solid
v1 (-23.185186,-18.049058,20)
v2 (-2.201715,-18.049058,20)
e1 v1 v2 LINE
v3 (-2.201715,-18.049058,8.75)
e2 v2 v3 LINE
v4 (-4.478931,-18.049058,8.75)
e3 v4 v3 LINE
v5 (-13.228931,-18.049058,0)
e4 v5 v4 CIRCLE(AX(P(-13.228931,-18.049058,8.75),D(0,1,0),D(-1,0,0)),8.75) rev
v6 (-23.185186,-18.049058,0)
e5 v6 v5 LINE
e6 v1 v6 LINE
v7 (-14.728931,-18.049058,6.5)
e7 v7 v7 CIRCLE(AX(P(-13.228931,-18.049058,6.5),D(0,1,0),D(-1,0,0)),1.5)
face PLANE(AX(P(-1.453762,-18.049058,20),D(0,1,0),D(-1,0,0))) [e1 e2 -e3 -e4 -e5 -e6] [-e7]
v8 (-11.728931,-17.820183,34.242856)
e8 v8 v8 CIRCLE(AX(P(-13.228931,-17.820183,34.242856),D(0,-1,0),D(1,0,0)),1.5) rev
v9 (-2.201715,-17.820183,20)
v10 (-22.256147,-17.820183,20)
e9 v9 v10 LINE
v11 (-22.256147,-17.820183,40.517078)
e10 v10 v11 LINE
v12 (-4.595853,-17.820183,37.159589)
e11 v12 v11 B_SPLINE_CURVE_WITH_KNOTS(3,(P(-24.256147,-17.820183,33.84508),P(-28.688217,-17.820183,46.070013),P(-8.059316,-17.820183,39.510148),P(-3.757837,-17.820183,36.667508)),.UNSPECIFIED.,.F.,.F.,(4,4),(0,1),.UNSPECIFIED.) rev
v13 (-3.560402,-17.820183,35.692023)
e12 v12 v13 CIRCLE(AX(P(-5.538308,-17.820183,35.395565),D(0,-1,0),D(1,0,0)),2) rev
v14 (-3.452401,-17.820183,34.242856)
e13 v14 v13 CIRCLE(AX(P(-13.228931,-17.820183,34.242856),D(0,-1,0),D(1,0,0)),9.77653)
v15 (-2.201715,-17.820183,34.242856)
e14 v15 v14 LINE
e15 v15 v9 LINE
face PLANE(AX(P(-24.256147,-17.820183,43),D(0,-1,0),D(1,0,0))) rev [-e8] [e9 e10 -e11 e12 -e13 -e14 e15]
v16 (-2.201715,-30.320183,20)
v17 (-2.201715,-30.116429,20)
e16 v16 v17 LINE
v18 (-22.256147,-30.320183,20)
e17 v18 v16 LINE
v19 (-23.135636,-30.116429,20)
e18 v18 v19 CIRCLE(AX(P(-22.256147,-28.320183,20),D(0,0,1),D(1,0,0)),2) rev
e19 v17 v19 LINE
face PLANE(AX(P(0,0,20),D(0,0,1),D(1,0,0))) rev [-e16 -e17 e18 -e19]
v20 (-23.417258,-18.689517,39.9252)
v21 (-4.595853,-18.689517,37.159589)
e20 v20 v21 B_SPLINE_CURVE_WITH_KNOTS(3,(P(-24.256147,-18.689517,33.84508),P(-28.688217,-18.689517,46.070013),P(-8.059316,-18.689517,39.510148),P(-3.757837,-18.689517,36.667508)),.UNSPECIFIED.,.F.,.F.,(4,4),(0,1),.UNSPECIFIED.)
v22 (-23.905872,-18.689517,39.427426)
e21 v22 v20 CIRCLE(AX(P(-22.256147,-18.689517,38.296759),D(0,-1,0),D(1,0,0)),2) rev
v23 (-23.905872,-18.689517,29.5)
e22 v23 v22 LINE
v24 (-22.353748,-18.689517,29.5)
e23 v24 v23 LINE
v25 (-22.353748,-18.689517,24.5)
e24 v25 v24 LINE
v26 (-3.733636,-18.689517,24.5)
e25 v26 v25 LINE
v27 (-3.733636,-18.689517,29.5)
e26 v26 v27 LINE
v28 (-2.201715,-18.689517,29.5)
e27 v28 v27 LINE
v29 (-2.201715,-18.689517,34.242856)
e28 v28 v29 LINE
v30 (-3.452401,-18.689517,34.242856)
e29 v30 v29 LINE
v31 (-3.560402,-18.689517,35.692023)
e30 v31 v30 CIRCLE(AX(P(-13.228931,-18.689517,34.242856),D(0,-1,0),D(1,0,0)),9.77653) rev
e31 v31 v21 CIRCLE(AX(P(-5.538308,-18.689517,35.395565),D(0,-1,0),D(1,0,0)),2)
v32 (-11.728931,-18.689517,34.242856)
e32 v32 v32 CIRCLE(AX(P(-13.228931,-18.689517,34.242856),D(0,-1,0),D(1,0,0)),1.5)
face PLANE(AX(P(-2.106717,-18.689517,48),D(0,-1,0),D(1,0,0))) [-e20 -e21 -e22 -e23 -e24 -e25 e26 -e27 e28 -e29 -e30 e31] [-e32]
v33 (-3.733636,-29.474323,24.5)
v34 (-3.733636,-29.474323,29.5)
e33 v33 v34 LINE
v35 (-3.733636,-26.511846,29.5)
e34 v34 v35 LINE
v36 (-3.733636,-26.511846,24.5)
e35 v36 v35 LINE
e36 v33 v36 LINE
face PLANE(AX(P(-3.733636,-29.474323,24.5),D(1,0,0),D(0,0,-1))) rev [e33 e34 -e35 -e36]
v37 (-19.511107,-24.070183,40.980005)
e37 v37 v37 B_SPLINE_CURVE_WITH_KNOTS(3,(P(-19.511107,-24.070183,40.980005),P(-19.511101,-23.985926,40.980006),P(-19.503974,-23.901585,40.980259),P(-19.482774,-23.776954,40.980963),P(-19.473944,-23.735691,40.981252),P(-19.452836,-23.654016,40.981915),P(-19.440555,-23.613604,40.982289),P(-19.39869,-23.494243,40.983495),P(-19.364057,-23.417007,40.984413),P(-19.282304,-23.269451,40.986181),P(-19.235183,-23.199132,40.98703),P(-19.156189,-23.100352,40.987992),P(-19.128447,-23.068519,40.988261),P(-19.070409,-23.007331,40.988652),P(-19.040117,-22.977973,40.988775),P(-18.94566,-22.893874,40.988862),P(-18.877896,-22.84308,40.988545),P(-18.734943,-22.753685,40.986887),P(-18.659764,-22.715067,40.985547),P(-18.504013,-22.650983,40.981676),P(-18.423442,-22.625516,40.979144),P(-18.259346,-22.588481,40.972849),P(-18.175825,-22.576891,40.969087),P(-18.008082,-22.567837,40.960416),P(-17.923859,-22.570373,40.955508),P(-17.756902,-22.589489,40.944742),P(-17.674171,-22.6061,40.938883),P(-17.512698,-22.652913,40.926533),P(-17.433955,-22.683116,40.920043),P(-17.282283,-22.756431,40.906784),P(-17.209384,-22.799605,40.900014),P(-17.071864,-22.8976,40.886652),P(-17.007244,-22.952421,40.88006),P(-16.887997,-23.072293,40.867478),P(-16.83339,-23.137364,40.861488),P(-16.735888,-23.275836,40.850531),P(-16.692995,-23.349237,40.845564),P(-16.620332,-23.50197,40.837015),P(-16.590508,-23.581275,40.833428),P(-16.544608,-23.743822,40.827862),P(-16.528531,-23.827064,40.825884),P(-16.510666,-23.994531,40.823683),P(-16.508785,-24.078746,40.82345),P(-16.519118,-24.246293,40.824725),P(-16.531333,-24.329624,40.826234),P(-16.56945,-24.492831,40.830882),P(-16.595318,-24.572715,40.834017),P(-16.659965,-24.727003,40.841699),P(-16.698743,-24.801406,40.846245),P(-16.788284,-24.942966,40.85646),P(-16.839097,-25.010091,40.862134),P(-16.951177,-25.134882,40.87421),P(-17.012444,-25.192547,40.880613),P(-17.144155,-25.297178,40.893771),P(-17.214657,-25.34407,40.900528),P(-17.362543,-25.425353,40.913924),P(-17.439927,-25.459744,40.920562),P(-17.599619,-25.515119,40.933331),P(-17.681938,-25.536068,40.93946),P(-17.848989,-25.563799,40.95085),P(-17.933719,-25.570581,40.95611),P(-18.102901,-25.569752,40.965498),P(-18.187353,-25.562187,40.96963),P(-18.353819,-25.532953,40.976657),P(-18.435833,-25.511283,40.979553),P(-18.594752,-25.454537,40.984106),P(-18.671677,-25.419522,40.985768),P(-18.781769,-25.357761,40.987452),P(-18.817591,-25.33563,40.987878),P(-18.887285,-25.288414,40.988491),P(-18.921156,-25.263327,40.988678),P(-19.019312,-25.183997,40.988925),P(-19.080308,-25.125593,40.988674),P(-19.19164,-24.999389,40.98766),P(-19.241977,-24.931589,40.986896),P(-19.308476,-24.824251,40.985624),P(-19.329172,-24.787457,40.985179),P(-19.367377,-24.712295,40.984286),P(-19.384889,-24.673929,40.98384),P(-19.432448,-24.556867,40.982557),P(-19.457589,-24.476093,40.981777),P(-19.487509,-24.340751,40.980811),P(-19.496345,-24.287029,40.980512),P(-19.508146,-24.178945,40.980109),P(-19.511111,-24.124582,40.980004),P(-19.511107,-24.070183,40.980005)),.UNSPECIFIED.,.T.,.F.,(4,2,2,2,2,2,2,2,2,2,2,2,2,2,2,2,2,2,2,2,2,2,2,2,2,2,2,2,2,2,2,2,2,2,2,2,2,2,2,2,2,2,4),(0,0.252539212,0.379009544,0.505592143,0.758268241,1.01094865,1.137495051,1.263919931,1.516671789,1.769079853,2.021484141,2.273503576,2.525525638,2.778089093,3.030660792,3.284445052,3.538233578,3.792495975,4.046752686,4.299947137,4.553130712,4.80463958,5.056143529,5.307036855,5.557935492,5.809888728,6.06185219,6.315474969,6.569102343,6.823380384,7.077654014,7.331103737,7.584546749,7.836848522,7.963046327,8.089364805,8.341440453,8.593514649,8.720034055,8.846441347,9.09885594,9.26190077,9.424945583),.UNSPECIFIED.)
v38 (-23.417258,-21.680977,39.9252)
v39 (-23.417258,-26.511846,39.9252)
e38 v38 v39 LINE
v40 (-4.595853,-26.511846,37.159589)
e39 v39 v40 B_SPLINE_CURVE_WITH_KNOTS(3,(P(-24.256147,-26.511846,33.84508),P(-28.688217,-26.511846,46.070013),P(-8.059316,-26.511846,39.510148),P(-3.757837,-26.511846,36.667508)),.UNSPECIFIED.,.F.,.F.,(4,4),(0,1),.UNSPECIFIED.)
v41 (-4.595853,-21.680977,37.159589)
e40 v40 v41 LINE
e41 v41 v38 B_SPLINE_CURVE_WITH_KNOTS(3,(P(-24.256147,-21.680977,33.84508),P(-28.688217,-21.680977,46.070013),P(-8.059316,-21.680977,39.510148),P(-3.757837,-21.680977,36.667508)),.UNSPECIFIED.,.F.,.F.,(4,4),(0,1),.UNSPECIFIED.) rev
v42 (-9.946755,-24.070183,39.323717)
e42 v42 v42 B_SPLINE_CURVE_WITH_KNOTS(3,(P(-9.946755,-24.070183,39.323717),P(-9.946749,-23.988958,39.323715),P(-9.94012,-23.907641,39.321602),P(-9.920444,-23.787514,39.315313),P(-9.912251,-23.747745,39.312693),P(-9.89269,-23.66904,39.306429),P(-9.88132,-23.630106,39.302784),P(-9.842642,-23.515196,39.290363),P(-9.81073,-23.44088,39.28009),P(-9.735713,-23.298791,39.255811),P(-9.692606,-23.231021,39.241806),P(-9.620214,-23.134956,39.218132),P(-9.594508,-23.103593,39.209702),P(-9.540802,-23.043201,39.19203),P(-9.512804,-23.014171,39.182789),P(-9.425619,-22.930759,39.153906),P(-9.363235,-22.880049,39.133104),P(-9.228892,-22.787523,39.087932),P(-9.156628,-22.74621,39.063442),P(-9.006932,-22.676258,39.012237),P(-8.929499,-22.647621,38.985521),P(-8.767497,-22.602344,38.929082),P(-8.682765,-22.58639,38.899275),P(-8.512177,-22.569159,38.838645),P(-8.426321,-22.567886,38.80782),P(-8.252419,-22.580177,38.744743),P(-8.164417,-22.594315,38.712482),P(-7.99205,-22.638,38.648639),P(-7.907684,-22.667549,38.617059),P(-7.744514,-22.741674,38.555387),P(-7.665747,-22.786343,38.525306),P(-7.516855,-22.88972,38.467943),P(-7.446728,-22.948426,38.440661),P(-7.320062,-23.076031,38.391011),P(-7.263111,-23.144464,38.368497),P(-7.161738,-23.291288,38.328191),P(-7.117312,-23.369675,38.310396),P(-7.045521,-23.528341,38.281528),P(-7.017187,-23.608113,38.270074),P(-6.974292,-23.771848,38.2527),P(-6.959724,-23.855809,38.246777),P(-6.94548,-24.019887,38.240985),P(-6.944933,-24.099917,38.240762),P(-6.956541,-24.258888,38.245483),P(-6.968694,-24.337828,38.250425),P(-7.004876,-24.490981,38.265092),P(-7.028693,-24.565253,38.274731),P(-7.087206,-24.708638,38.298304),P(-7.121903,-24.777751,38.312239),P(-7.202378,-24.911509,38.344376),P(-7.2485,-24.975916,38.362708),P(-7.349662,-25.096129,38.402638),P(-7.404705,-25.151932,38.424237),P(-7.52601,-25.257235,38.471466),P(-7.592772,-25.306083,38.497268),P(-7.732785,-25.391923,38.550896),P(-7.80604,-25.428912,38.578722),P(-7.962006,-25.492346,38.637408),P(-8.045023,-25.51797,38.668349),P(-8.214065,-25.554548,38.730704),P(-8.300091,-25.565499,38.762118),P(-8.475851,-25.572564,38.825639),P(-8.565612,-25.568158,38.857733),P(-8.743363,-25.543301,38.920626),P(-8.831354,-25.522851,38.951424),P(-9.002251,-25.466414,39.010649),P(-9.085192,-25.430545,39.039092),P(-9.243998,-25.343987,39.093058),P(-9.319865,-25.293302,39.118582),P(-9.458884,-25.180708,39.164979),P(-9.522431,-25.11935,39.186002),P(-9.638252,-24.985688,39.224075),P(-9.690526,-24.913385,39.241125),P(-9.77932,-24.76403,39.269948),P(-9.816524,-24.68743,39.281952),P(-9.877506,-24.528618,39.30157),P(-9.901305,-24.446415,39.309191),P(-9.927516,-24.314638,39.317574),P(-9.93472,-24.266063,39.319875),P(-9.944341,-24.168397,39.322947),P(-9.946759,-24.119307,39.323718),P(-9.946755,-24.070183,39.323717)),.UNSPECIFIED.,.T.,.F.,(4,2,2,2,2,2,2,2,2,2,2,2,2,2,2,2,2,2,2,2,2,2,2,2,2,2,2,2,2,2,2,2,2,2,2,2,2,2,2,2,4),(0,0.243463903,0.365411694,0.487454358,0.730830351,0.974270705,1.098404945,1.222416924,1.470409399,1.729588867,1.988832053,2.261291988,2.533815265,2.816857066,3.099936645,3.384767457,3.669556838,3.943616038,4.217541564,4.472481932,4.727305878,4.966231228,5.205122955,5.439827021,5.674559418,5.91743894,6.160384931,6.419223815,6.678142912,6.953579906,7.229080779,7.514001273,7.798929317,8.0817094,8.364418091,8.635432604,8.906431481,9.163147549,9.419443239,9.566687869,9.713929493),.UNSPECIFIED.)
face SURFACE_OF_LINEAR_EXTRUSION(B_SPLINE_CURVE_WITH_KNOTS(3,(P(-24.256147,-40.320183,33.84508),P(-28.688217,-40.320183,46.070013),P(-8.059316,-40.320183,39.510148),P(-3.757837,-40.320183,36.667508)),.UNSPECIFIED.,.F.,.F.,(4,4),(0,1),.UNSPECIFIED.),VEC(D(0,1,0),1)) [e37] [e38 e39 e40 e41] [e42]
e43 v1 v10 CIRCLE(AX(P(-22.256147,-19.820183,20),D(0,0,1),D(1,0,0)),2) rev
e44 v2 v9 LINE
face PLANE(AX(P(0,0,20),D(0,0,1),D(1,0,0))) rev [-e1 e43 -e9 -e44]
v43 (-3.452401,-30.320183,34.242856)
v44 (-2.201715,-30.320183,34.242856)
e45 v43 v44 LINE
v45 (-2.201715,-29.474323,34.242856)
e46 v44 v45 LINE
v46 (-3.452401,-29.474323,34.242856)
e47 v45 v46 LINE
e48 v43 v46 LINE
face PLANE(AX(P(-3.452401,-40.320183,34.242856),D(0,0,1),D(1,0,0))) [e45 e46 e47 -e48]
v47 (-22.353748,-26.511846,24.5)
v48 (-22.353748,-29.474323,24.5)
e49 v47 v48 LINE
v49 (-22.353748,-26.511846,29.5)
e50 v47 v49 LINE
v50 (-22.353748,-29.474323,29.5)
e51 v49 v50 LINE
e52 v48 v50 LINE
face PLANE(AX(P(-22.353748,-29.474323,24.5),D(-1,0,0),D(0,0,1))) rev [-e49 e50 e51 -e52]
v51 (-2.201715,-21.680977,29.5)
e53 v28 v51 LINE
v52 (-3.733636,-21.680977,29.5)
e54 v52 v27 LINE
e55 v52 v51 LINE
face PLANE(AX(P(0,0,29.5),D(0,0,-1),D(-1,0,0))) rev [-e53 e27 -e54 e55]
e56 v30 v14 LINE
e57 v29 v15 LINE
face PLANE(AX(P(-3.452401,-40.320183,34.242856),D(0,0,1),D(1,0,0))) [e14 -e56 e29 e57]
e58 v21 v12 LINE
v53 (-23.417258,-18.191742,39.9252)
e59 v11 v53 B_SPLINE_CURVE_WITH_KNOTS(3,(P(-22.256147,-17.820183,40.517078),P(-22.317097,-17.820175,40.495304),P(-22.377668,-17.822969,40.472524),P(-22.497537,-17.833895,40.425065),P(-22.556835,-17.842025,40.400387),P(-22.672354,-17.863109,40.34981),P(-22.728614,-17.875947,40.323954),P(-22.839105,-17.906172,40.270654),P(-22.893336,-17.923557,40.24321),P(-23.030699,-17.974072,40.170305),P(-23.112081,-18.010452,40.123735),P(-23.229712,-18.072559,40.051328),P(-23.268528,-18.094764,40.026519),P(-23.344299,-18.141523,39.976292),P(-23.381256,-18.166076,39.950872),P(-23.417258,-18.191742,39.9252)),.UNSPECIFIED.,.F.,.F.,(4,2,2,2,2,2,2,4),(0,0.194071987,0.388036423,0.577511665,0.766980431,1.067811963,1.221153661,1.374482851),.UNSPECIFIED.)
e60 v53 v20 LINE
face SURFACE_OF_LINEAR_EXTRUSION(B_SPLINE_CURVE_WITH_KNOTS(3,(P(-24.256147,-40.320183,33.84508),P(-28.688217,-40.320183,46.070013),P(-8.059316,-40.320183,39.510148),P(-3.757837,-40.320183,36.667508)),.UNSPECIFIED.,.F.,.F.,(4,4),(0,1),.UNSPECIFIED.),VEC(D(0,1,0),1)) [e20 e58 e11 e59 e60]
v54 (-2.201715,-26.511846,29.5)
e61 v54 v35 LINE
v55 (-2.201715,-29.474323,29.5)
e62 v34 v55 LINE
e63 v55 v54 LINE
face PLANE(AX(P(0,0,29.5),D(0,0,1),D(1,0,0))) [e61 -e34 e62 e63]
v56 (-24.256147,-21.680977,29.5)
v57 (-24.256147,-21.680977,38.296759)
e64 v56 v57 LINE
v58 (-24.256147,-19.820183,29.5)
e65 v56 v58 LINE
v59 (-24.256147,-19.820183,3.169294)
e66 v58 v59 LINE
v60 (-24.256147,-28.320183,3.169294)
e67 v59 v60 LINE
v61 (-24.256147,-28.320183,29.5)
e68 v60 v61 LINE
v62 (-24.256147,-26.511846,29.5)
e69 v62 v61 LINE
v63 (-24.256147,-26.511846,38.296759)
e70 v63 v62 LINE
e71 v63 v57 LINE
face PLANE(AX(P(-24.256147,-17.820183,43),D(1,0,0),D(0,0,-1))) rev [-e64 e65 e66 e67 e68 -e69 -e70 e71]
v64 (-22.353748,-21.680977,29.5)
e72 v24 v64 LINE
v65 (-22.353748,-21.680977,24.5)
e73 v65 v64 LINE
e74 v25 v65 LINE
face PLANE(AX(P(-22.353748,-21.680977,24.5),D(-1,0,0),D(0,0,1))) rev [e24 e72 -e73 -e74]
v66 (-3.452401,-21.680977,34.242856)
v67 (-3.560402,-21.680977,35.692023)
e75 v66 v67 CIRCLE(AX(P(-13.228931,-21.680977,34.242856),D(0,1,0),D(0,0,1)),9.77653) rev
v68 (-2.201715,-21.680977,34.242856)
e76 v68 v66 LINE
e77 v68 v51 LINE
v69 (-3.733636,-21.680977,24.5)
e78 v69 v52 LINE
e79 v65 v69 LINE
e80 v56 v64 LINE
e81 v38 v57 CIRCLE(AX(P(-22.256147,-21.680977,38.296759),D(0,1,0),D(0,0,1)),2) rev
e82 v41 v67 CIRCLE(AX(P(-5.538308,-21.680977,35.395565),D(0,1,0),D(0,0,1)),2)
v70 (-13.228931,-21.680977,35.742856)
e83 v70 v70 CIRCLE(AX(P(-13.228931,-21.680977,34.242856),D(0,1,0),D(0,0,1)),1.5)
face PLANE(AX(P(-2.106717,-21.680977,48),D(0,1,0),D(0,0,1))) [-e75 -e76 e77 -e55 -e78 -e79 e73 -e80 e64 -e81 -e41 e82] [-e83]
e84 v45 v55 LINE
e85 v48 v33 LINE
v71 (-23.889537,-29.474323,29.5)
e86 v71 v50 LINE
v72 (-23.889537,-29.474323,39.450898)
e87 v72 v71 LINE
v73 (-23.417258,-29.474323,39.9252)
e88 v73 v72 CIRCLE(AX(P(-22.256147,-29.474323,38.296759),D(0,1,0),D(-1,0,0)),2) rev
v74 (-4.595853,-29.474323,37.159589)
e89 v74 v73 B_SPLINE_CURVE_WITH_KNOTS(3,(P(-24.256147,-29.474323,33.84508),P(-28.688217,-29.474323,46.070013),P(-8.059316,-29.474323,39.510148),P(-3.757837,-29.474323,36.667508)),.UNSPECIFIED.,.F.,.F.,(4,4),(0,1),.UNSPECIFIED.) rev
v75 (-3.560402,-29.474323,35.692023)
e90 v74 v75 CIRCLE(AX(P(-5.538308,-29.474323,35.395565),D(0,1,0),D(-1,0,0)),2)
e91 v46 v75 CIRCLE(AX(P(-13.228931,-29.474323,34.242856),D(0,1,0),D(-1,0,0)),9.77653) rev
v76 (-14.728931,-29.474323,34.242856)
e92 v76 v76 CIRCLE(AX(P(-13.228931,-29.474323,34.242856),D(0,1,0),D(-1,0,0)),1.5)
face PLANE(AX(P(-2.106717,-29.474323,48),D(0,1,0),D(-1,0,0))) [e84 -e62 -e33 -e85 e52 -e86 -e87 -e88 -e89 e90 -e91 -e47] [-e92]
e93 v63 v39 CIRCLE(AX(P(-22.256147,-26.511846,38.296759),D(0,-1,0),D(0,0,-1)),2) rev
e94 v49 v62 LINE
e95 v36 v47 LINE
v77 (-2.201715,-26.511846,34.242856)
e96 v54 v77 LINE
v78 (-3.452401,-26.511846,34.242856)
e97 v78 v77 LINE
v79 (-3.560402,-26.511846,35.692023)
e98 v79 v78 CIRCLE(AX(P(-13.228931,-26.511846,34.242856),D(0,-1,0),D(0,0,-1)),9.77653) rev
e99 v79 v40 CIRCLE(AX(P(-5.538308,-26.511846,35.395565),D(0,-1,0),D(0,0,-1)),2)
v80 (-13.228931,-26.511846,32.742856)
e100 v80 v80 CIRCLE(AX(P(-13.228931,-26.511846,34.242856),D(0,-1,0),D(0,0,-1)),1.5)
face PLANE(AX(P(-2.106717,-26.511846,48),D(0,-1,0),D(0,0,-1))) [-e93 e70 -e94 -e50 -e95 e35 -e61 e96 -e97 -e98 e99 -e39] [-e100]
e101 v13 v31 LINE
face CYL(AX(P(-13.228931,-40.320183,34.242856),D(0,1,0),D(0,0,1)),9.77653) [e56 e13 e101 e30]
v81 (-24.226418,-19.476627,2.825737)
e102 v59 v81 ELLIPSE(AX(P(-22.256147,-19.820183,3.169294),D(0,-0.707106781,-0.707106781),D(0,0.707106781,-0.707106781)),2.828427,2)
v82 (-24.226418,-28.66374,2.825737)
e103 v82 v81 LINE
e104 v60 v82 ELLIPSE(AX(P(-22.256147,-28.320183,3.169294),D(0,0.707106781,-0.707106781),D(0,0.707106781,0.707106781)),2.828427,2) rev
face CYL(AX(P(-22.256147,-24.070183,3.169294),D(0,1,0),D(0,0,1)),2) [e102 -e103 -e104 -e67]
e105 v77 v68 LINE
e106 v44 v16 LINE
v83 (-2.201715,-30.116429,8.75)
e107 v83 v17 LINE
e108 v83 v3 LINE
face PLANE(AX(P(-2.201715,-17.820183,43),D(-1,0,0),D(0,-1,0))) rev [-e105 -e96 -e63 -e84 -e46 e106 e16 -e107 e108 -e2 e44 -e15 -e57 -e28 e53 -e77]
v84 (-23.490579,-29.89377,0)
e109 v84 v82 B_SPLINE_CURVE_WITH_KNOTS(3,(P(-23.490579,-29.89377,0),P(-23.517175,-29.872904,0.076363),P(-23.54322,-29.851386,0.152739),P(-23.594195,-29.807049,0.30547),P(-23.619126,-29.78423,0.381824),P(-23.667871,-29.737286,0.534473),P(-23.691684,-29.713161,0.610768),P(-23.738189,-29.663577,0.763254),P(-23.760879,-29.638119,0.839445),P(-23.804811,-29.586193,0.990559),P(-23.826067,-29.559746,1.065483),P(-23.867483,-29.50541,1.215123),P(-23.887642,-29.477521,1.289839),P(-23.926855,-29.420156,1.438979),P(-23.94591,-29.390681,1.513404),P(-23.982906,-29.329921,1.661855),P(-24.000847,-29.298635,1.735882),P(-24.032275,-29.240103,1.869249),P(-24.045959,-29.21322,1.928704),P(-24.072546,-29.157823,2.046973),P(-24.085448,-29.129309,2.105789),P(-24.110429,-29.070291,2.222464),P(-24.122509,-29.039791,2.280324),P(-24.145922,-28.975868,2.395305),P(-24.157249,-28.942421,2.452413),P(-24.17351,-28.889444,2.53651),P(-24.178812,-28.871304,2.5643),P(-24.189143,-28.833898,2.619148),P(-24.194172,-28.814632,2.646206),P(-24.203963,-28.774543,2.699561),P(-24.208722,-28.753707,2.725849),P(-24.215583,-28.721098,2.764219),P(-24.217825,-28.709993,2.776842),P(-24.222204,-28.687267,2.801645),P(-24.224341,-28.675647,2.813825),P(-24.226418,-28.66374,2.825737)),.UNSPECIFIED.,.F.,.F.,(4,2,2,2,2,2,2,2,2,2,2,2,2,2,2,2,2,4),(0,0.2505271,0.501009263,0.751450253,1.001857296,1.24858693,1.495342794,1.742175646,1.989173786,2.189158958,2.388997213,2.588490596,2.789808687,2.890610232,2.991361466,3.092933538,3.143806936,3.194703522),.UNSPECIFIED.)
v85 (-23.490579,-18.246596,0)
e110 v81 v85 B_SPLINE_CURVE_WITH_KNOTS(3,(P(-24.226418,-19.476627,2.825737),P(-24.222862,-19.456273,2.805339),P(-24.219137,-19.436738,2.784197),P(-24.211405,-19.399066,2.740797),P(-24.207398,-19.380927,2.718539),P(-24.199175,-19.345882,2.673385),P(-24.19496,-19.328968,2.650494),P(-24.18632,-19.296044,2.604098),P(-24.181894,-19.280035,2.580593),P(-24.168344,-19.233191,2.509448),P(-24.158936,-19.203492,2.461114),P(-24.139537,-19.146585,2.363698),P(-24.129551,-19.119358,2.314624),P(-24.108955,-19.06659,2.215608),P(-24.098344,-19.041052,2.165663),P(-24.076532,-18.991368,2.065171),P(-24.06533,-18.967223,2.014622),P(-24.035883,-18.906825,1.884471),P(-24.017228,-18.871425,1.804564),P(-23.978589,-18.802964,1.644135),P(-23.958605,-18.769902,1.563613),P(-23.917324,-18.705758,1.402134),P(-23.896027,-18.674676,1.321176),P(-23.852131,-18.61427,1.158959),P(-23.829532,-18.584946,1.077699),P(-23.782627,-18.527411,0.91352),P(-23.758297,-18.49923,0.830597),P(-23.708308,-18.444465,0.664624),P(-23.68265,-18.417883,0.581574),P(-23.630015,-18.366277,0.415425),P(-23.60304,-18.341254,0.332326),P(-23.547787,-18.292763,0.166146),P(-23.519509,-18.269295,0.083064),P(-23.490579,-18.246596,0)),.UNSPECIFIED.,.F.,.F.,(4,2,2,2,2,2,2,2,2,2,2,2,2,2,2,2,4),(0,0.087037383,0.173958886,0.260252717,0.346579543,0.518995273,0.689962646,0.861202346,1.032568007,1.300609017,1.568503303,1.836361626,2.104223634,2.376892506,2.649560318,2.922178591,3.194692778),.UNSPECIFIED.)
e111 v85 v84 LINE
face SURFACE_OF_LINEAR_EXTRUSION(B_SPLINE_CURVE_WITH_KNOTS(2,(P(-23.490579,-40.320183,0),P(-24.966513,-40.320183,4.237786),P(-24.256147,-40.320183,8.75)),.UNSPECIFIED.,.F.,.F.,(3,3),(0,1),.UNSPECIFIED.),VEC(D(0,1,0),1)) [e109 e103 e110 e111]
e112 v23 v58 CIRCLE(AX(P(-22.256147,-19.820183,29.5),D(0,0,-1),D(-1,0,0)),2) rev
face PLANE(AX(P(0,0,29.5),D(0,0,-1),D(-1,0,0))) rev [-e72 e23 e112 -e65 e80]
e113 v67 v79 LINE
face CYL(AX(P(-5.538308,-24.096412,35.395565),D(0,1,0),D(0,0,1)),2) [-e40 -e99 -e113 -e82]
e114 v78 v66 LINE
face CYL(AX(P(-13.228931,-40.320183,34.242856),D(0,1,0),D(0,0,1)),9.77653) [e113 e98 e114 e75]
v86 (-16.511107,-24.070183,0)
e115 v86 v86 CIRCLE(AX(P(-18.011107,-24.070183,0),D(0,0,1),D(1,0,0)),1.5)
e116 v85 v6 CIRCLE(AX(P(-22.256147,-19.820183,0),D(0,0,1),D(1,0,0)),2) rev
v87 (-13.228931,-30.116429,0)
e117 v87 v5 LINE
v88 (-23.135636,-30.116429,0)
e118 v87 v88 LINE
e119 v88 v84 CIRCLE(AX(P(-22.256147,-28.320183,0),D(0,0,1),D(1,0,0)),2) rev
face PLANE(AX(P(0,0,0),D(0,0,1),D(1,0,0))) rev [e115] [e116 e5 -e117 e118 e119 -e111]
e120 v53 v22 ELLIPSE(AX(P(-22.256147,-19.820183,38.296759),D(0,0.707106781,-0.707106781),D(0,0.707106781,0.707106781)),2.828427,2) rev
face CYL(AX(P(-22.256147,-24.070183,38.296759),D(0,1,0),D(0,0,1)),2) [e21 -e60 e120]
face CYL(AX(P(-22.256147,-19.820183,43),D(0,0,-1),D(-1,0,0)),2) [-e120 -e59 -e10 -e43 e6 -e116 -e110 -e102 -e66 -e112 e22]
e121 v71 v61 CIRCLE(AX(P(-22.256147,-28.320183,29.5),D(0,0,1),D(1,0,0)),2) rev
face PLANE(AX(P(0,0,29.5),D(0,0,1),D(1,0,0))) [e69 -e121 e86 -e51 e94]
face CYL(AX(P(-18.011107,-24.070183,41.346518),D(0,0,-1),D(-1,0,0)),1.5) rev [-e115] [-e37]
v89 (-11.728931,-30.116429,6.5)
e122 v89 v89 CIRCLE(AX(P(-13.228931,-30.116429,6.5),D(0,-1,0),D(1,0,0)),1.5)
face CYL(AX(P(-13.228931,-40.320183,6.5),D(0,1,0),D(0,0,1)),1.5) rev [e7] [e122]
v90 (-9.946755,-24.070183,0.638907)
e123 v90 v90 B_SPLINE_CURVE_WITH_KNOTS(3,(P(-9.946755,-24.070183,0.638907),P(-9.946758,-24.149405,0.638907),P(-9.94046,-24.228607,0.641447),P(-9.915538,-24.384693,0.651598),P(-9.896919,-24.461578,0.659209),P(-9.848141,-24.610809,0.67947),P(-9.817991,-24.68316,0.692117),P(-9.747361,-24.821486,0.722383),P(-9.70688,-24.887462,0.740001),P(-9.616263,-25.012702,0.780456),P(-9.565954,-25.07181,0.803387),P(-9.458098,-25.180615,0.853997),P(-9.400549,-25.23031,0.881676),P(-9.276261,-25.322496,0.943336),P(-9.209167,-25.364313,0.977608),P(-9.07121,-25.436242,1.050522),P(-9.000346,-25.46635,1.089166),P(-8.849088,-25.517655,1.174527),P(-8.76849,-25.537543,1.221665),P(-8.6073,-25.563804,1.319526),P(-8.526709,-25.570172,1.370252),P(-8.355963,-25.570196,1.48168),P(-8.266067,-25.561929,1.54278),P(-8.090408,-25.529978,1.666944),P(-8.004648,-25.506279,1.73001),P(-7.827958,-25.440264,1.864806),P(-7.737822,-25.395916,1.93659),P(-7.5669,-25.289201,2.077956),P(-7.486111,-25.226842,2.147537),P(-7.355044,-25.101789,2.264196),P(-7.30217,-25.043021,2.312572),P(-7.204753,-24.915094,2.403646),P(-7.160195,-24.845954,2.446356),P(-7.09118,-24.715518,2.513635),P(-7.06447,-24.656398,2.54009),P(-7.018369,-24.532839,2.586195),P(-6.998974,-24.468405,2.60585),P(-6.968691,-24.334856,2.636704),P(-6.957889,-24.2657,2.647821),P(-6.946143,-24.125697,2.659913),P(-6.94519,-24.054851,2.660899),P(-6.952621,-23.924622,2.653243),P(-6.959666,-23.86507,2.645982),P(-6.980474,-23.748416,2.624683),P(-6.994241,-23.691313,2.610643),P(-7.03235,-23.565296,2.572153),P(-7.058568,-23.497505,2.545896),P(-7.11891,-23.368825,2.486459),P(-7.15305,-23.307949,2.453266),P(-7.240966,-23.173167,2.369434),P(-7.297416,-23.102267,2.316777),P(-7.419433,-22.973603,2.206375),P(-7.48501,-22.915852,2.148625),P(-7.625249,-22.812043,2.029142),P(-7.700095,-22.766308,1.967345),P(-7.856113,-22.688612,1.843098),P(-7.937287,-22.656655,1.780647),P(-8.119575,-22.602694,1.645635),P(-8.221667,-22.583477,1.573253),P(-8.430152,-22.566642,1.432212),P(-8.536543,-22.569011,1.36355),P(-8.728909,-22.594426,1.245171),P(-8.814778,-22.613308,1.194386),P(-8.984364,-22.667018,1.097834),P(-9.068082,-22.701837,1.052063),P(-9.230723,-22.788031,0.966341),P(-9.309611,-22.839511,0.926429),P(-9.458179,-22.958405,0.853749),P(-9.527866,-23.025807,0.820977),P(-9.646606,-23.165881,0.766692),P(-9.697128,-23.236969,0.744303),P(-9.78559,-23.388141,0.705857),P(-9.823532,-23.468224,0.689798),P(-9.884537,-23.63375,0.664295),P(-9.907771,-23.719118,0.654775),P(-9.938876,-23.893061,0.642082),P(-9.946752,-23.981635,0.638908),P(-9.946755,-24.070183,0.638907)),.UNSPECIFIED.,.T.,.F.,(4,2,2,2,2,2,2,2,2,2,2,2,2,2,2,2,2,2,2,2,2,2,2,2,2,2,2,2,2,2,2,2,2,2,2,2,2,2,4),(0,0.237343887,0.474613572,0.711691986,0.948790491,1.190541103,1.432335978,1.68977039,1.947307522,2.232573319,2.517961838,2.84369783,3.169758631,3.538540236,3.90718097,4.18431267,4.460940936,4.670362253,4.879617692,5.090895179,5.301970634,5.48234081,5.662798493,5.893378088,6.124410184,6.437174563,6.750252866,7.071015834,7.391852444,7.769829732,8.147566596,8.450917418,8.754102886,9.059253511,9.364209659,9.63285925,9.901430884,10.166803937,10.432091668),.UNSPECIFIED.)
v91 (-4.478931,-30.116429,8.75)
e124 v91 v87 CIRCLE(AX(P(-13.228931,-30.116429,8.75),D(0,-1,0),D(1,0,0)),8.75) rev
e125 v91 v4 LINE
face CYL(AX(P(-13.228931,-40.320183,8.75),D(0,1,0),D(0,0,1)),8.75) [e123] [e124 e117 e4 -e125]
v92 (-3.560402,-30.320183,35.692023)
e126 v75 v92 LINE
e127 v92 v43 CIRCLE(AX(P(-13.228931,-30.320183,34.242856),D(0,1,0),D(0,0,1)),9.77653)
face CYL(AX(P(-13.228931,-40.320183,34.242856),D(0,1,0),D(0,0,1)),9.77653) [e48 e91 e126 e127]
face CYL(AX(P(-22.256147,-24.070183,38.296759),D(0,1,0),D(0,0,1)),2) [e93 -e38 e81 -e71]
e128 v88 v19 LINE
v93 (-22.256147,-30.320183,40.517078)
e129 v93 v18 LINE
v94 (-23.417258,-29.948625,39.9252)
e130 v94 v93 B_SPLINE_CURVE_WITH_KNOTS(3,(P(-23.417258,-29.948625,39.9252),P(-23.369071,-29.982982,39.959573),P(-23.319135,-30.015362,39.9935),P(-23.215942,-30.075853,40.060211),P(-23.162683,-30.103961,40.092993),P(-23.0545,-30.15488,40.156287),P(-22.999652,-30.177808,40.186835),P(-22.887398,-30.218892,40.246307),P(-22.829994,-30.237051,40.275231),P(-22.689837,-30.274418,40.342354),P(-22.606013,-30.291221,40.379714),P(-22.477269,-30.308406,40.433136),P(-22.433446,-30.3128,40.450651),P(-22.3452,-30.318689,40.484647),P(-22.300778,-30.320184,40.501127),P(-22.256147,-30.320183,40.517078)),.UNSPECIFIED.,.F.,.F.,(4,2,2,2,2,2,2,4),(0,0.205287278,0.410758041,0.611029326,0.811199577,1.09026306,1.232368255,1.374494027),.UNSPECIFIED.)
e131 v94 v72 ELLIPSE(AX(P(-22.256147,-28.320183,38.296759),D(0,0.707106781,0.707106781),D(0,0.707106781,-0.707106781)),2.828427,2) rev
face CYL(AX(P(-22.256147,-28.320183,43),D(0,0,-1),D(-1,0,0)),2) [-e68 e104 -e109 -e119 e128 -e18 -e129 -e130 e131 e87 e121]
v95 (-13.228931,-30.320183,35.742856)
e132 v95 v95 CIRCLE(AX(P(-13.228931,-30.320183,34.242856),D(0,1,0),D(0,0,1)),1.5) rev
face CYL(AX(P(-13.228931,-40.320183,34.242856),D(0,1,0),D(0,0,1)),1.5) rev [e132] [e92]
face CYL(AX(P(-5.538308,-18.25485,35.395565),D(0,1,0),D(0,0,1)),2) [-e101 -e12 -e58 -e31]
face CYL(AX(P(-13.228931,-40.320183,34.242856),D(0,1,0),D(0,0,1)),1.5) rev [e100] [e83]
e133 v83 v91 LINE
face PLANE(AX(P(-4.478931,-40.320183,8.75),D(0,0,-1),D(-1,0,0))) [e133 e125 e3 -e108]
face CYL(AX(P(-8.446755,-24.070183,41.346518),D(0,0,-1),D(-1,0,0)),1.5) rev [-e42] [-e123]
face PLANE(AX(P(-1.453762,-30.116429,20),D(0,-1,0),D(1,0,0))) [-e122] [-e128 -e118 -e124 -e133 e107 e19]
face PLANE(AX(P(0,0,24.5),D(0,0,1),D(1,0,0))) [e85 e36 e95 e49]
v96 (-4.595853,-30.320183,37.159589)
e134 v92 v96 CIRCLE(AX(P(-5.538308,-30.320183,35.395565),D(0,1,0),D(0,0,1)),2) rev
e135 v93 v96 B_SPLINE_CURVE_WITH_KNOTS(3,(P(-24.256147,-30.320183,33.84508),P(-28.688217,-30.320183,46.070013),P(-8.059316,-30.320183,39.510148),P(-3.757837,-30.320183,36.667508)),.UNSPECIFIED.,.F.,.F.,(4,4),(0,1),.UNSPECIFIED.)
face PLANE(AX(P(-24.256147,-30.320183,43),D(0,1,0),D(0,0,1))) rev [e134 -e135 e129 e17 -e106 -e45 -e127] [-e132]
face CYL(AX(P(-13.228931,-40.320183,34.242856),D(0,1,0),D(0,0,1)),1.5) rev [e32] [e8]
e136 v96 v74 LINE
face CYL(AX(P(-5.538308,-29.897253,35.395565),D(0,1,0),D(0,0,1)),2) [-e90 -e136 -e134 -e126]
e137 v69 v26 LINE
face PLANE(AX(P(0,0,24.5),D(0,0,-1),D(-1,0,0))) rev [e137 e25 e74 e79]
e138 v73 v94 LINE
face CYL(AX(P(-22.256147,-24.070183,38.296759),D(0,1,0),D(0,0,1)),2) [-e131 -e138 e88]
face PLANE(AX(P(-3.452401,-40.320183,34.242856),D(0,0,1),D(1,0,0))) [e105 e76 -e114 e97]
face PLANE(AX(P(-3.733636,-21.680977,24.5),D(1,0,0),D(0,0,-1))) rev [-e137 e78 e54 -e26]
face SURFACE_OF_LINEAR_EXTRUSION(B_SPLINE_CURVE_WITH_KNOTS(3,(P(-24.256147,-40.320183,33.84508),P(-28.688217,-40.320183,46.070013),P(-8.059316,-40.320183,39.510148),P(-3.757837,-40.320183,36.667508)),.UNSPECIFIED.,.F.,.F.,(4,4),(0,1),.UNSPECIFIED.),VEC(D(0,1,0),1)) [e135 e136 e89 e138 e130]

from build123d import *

# Parameters (mm, degrees)
SKETCH1_W               = 22.054431489
SKETCH1_H               = 12.5
BOSS_EXTRUDE1_DEPTH     = 43
CUT_EXTRUDE1_DEPTH      = 10
CUT_EXTRUDE1_DEPTH_BACK = 15
SKETCH2_R               = 1.5
FILLET3_R               = 2
SKETCH5_R               = 1.5
CUT_EXTRUDE4_DEPTH      = 57.460223181
CUT_EXTRUDE6_DEPTH      = 10
CUT_EXTRUDE6_DEPTH_BACK = 8.5
SKETCH16_W              = 22.254981862
SKETCH16_H              = 2.991460448
SKETCH16_H_2            = 2.962476682
FILLET4_R               = 2
SKETCH17_W              = 18.620112401
SKETCH17_H              = 2.962476682
SKETCH17_H_2            = 2.991460448
CUT_EXTRUDE7_DEPTH      = 5
SKETCH18_W              = 23.815970502
SKETCH18_H              = 0.508634756
SKETCH18_W_2            = 23.819185945
SKETCH18_H_2            = 0.668990904
CUT_EXTRUDE8_DEPTH      = 20


with BuildPart() as part:
    # Sketch1 → Boss-Extrude1 (new body)
    with BuildSketch(Plane.XY):
        with Locations((-13.228930986, -24.070183414)):
            Rectangle(SKETCH1_W, SKETCH1_H)
    extrude(amount=BOSS_EXTRUDE1_DEPTH)

    # Sketch2 → Cut-Extrude1 (cut, two sides: drawn at the far end of the back side and taken through both)
    with BuildSketch(Plane.XZ.offset(30.320183414).offset(-CUT_EXTRUDE1_DEPTH_BACK)):
        with Locations(Location((-13.228930986, 6.5, 0), (0, 0, 90))):
            Circle(SKETCH2_R)
        with Locations(Location((-13.228930986, 34.242856315, 0), (0, 0, 90))):
            Circle(SKETCH2_R)
        with BuildLine():
            Line((-3.452400544, 34.242856315), (-2.201715242, 34.242856315))
            add(Edge.make_bspline(
                [(-24.256146731, 33.845079723), (-30.575526658, 43.607362182), (-11.195866971, 55.012360634), (11.473693948, 42.135391331), (-2.201715242, 34.242856315)],
                knots=[0, 0, 0, 0, 0.486113305, 1, 1, 1, 1], degree=3))
            add(Edge.make_bspline(
                [(-3.757837453, 36.667507789), (-8.059315717, 39.510148032), (-28.688217354, 46.070013084), (-24.256146731, 33.845079723)],
                knots=[0, 0, 0, 0, 1, 1, 1, 1], degree=3))
            ThreePointArc((-3.757837453, 36.667507789), (-3.529060324, 35.464763275), (-3.452400544, 34.242856315))
        make_face()
        with BuildLine():
            Line((-4.478930986, 8.75), (-2.201715242, 8.75))
            add(Edge.make_bspline(
                [(-2.201715242, 8.75), (5.39210746, 3.880294823), (-0.777052631, -4.523329032), (-17.174300591, -10.623347238), (-34.821400648, -0.026005424), (-24.256146731, 8.75)],
                knots=[0, 0, 0, 0, 0.283272691, 0.504244858, 1, 1, 1, 1], degree=3))
            add(Edge.make_bspline(
                [(-23.490579314, 0), (-24.966512963, 4.237786421), (-24.256146731, 8.75)],
                knots=[0, 0, 0, 1, 1, 1], degree=2))
            Line((-23.490579314, 0), (-13.228930986, 0))
            ThreePointArc((-13.228930986, 0), (-7.041746651, 2.562815665), (-4.478930986, 8.75))
        make_face()
    extrude(amount=CUT_EXTRUDE1_DEPTH + CUT_EXTRUDE1_DEPTH_BACK, mode=Mode.SUBTRACT)

    # Fillet3
    # the kernel refuses this fillet: 2 mm, written as the material it takes off along each edge
    with BuildSketch(Plane(origin=(-24.256146731, -17.820183414, -5.498495188), x_dir=(1, 0, 0), z_dir=(0, 0, 1))) as fillet3_piece_1:
        with BuildLine():
            CenterArc((FILLET3_R, -FILLET3_R), FILLET3_R, 90, 90)
            Line((0, -FILLET3_R), (-FILLET3_R * 0.02, -FILLET3_R))
            Line((-FILLET3_R * 0.02, -FILLET3_R), (-FILLET3_R * 0.02, FILLET3_R * 0.02))
            Line((-FILLET3_R * 0.02, FILLET3_R * 0.02), (FILLET3_R, FILLET3_R * 0.02))
            Line((FILLET3_R, FILLET3_R * 0.02), (FILLET3_R, 0))
        make_face()
    extrude(amount=49.579952304, mode=Mode.SUBTRACT)
    with BuildSketch(Plane(origin=(-24.256146731, -30.320183414, -5.498495188), x_dir=(1, 0, 0), z_dir=(0, 0, 1))) as fillet3_piece_2:
        with BuildLine():
            CenterArc((FILLET3_R, FILLET3_R), FILLET3_R, 180, 90)
            Line((0, FILLET3_R), (-FILLET3_R * 0.02, FILLET3_R))
            Line((-FILLET3_R * 0.02, FILLET3_R), (-FILLET3_R * 0.02, -FILLET3_R * 0.02))
            Line((-FILLET3_R * 0.02, -FILLET3_R * 0.02), (FILLET3_R, -FILLET3_R * 0.02))
            Line((FILLET3_R, -FILLET3_R * 0.02), (FILLET3_R, 0))
        make_face()
    extrude(amount=49.579952304, mode=Mode.SUBTRACT)
    with BuildSketch(Plane(origin=(-24.256146731, -17.374523396, 3.001504812), x_dir=(0.16676818592575848, -1.2260366807919533e-15, -0.9859961319209278), z_dir=(0, -1, 0))) as fillet3_piece_3:
        with BuildLine():
            CenterArc((0.168096911, 1.999974157), FILLET3_R, 260.400032587, 9.891234523)
            Line((-0.165439461, 0.027981894), (-0.172110188, -0.011457952))
            Line((-0.172110188, -0.011457952), (-0.006670727, -0.039439845))
            Line((-0.006670727, -0.039439845), (-0.00020343, -0.039999483))
            ThreePointArc((-0.00020343, -0.039999483), (0.089132026, -0.040226606), (0.178467349, -0.039999483))
            Line((0.178467349, -0.039999483), (0.178264007, 0))
        make_face()
    extrude(amount=13.391320036, mode=Mode.SUBTRACT)
    with BuildSketch(Plane(origin=(-24.256146731, -14.845669726, 39.081457115), x_dir=(0.7050638771295608, 0, 0.7091438000624637), z_dir=(0, -1, 0))) as fillet3_piece_4:
        with BuildLine():
            CenterArc((0.853663976, -1.971549871), FILLET3_R, 80.324332734, 54.510372083)
            Line((-0.556463778, -0.553262271), (-0.584666333, -0.524896519))
            Line((-0.584666333, -0.524896519), (-0.028202555, 0.028365752))
            Line((-0.028202555, 0.028365752), (-0.007160044, 0.039353955))
            ThreePointArc((-0.007160044, 0.039353955), (0.595170372, 0.092331415), (1.196528305, 0.039430997))
            Line((1.196528305, 0.039430997), (1.189805475, 0))
        make_face()
    extrude(amount=18.449027376, mode=Mode.SUBTRACT)

    # Sketch5 → Cut-Extrude4 (cut, through all)
    with BuildSketch(Plane.XY):
        with Locations(Location((-18.011106811, -24.070183414, 0), (0, 0, 180))):
            Circle(SKETCH5_R)
        with Locations(Location((-8.446755162, -24.070183414, 0), (0, 0, 180))):
            Circle(SKETCH5_R)
    extrude(amount=CUT_EXTRUDE4_DEPTH, mode=Mode.SUBTRACT)

    # Sketch16 → Cut-Extrude6 (cut, two sides: drawn at the far end of the back side and taken through both)
    with BuildSketch(Plane.XY.offset(38).offset(-CUT_EXTRUDE6_DEPTH_BACK)):
        with Locations((-13.23420775, -20.185246876)):
            Rectangle(SKETCH16_W, SKETCH16_H)
        with Locations((-13.23420775, -27.993084265)):
            Rectangle(SKETCH16_W, SKETCH16_H_2)
    extrude(amount=CUT_EXTRUDE6_DEPTH + CUT_EXTRUDE6_DEPTH_BACK, mode=Mode.SUBTRACT)

    # Fillet4
    fillet4_edges = [part.edges().sort_by_distance(p)[0] for p in [
        (-3.757837453, -18.254850033, 36.667507789),
        (-3.757837453, -24.096411512, 36.667507789),
        (-3.757837453, -29.89725301, 36.667507789),
    ]]
    fillet(fillet4_edges, radius=FILLET4_R)

    # Sketch17 → Cut-Extrude7 (cut)
    with BuildSketch(Plane.XY.offset(29.5)):
        with Locations((-13.043692231, -27.993084265)):
            Rectangle(SKETCH17_W, SKETCH17_H)
        with Locations((-13.043692231, -20.185246876)):
            Rectangle(SKETCH17_W, SKETCH17_H_2)
    extrude(amount=-CUT_EXTRUDE7_DEPTH, mode=Mode.SUBTRACT)

    # Sketch18 → Cut-Extrude8 (cut)
    with BuildSketch(Plane.XY):
        with Locations((-13.361747728, -30.370746627)):
            Rectangle(SKETCH18_W, SKETCH18_H)
        with Locations((-13.36335545, -17.714562357)):
            Rectangle(SKETCH18_W_2, SKETCH18_H_2)
    extrude(amount=CUT_EXTRUDE8_DEPTH, mode=Mode.SUBTRACT)


solid = part.part
